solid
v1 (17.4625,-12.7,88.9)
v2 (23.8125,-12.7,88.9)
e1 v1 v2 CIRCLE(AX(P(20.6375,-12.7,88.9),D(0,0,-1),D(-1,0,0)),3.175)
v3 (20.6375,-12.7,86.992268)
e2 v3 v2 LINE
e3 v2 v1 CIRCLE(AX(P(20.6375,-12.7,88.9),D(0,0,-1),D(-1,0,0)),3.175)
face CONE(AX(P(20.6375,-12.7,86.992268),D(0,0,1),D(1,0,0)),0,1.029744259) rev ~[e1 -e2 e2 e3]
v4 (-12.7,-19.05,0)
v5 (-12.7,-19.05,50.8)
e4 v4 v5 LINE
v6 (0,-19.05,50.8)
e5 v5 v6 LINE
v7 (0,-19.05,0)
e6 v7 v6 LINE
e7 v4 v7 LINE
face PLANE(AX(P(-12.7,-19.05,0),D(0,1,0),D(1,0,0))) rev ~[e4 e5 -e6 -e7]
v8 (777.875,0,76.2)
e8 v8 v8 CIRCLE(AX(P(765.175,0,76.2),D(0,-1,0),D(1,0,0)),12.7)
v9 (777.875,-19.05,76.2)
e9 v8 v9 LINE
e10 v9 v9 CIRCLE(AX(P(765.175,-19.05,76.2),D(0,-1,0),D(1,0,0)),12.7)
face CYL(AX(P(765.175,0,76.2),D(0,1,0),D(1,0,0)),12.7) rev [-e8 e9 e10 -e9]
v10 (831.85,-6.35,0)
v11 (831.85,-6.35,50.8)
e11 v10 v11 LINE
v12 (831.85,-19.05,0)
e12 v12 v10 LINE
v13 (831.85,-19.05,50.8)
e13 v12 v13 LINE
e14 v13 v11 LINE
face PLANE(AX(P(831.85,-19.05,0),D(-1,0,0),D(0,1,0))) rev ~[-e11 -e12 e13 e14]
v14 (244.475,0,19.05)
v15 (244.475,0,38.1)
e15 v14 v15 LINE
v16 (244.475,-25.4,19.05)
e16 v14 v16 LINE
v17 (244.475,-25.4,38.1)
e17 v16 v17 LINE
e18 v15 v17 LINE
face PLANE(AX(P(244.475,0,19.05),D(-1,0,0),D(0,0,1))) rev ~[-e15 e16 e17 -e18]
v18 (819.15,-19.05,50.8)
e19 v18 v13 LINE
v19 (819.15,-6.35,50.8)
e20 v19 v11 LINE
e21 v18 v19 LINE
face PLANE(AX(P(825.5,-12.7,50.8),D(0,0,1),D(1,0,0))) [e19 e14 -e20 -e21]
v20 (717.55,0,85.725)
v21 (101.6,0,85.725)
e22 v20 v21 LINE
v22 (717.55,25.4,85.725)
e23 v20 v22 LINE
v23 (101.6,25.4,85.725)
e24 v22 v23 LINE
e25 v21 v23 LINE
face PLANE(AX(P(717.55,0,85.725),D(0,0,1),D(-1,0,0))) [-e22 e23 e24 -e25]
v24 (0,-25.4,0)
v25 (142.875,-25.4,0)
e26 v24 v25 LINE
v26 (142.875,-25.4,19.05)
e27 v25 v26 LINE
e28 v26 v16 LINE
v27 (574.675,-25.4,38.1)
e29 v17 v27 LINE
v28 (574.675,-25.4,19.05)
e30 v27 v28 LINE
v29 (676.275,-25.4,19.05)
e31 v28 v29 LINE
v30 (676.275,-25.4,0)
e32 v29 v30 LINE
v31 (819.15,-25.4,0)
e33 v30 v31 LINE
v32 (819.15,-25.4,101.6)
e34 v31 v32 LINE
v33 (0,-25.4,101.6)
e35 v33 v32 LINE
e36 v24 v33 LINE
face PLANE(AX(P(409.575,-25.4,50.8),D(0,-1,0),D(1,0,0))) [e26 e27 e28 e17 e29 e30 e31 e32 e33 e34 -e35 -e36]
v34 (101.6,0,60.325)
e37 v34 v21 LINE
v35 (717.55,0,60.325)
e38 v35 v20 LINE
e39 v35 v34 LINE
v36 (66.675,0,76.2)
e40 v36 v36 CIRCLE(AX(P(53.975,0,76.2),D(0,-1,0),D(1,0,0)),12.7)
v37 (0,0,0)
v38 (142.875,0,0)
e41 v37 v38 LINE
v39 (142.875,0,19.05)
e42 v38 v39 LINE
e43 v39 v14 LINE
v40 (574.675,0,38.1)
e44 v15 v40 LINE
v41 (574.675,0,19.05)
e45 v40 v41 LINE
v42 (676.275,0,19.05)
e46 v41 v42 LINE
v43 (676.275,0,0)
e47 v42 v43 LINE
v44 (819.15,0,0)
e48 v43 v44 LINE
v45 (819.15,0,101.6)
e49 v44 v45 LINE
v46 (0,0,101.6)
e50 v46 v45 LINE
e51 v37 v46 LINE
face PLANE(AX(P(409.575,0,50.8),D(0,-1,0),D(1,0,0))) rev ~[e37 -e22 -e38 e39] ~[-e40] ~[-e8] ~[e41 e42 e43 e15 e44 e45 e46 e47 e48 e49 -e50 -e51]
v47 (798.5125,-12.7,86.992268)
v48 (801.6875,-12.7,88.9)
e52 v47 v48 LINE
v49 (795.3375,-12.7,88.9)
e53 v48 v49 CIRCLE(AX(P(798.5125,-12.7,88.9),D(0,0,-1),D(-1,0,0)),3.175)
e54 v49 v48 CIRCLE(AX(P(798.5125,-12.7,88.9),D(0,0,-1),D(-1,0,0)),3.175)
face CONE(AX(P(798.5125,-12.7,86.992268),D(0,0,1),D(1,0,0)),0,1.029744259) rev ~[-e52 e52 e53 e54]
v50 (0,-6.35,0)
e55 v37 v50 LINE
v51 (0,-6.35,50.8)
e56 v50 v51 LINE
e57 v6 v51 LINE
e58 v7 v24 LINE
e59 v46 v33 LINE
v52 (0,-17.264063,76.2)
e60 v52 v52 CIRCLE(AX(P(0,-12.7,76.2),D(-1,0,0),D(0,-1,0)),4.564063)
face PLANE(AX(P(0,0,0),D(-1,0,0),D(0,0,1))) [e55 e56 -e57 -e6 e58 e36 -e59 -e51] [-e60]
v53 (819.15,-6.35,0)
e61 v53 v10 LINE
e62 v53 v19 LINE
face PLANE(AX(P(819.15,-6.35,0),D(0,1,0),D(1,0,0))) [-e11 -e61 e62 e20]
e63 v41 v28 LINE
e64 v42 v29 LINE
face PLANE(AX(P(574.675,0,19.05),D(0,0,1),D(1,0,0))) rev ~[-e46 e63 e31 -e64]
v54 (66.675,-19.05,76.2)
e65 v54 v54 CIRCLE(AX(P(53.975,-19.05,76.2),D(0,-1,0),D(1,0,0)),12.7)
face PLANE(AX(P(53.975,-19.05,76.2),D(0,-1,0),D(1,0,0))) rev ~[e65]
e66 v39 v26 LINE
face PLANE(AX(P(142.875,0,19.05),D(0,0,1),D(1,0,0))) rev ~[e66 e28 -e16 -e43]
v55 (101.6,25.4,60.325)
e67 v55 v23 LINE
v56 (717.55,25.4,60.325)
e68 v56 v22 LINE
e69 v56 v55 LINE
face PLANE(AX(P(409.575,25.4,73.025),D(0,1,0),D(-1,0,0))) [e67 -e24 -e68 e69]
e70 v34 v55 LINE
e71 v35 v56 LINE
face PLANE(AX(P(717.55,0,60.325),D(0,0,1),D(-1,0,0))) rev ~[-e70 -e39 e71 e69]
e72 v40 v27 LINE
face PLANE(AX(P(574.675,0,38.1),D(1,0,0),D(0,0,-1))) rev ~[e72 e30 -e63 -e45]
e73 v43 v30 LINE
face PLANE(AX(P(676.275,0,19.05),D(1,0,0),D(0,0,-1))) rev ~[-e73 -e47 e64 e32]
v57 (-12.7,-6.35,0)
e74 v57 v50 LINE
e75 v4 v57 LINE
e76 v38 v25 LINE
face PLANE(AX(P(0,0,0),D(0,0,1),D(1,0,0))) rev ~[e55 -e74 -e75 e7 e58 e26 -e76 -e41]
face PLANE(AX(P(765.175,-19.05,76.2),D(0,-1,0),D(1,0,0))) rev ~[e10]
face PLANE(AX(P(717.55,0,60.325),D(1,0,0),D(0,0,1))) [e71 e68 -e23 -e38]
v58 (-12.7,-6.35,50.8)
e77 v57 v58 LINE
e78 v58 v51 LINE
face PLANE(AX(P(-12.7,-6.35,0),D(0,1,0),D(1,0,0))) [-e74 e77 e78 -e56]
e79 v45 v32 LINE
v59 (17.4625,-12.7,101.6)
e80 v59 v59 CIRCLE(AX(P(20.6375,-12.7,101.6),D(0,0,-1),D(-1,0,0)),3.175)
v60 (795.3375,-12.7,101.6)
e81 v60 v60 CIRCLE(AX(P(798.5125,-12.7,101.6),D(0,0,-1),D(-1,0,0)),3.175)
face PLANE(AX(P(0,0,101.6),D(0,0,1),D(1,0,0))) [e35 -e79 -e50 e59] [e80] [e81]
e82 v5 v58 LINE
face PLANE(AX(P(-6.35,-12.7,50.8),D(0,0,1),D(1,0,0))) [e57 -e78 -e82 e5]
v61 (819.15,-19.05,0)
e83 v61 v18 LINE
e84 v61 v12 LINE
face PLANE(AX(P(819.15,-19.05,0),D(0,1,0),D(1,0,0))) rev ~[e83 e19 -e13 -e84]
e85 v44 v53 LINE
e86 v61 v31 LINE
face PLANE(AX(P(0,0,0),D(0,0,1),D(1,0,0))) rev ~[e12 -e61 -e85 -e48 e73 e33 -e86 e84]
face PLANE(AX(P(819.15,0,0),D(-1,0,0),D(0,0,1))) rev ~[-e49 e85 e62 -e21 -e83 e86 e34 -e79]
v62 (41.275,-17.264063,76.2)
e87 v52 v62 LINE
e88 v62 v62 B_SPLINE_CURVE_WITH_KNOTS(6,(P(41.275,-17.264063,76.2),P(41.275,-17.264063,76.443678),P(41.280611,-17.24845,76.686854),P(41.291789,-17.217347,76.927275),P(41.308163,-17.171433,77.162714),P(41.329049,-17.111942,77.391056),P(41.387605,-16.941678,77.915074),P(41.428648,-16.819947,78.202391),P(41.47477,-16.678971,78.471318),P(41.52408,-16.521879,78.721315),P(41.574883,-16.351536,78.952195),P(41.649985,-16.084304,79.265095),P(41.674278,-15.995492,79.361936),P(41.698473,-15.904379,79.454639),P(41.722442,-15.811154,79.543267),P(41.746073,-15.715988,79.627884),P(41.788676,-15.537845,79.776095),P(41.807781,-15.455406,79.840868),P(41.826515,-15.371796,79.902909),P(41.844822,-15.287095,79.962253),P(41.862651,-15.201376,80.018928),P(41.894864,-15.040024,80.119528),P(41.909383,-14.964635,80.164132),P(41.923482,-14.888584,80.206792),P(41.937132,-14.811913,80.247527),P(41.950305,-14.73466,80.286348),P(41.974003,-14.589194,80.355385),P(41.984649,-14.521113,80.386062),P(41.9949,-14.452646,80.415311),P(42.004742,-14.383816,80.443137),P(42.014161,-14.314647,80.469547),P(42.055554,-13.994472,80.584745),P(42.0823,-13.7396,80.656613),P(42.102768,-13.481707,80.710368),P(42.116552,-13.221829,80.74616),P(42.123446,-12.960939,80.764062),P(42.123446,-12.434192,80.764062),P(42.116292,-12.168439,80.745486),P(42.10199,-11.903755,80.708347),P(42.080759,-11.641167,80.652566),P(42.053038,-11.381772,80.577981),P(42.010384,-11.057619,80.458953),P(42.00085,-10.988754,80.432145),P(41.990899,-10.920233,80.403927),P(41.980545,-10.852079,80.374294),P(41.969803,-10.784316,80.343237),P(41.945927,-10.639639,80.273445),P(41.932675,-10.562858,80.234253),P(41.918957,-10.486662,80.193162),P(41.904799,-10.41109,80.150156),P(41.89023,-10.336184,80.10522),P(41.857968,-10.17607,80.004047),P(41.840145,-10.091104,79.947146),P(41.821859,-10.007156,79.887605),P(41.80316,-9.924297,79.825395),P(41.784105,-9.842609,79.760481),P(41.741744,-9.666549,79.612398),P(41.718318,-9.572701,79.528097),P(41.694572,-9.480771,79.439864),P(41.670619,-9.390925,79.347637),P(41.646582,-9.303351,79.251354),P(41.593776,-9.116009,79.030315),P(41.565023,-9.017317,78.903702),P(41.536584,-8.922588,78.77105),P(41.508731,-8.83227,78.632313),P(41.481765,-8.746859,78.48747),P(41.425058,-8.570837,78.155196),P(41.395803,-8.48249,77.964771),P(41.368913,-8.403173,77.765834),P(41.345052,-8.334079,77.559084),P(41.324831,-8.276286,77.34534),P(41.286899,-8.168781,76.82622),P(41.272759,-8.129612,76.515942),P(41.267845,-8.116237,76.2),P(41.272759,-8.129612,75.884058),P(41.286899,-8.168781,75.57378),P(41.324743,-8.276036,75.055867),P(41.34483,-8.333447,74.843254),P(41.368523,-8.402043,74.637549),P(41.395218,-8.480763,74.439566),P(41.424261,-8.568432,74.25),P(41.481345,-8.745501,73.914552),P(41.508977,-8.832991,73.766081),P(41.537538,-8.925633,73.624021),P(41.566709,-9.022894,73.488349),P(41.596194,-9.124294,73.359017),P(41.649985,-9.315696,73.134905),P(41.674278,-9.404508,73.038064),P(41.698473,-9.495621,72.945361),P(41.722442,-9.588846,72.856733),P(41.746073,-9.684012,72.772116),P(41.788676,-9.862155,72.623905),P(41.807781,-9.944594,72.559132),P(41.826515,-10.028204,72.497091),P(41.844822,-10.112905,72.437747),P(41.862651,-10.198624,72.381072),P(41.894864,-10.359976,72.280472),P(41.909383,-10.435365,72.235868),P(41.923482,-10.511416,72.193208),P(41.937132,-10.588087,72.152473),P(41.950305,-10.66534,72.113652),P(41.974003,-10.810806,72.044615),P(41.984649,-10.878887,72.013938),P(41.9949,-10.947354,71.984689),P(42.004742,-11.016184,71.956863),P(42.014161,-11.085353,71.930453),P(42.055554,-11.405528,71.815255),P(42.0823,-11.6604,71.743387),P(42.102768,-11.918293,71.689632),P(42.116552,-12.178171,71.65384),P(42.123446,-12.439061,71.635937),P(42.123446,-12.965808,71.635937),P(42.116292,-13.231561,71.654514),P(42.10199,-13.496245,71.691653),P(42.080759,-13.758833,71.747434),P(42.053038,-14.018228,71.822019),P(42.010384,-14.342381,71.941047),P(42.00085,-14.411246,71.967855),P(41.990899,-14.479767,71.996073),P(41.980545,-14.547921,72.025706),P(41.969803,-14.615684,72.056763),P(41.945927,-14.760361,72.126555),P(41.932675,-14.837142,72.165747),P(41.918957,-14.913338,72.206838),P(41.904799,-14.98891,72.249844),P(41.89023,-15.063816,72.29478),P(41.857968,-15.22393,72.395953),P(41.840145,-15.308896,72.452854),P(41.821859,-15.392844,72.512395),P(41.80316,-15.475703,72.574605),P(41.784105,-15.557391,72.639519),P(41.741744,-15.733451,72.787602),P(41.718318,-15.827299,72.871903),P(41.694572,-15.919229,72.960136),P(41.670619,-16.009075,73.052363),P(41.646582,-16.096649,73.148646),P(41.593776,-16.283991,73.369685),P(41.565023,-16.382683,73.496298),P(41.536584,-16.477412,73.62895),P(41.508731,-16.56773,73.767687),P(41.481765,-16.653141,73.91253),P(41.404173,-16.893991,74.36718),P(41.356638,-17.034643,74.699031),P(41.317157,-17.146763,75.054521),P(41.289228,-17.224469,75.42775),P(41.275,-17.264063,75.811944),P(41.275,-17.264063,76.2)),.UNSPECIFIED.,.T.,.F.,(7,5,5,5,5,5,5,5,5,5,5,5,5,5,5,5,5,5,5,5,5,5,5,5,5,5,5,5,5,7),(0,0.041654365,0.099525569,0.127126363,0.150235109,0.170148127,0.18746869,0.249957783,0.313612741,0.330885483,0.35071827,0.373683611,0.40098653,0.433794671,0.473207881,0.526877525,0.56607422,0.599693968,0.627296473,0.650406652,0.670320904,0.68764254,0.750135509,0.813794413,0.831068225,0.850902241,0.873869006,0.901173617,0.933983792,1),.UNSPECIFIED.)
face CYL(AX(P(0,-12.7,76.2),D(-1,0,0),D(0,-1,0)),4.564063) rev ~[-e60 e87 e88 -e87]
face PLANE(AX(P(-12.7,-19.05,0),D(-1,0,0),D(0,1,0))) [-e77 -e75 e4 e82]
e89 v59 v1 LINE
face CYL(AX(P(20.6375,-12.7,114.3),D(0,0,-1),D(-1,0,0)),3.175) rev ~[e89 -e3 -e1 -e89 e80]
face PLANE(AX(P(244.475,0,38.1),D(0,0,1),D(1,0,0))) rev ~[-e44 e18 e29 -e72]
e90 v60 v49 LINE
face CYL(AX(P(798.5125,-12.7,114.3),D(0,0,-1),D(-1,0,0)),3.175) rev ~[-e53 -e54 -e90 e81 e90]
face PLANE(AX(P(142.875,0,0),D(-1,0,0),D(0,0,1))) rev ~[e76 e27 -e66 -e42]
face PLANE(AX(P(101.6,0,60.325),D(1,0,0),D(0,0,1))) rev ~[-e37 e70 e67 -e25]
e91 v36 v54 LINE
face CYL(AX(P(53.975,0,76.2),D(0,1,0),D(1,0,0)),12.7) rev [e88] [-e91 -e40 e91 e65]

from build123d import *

# Parameters (mm, degrees)
F0_W      = 819.15
F0_H      = 101.6
F1_DEPTH  = 25.4
F2_R      = 4.5640625
F3_DEPTH  = 50.8
F4_R      = 12.7
F5_DEPTH  = 19.05
F7_DEPTH  = 25.4
F9_D      = 6.35
F9_DEPTH  = 12.7
F9_TIP    = 1.9077324654
F10_W     = 12.7
F10_H     = 12.7
F11_DEPTH = 50.8
F12_W     = 615.95
F12_H     = 25.4
F13_DEPTH = 25.4


# Not quite as in the source:
# - a feature names something its author has since deleted; it is built from what else it names


with BuildPart() as f1:
    # F0 (on Front) → F1 (new body)
    with BuildSketch(Plane.XZ):
        with Locations((409.575, 50.8)):
            Rectangle(F0_W, F0_H)
    extrude(amount=F1_DEPTH)

    # F2 (on face) → F3 (cut)
    with BuildSketch(Plane(origin=(0, 0, 0), x_dir=(0, -1, 0), z_dir=(-1, 0, 0))):
        with Locations((12.7, 76.2)):
            Circle(F2_R)
    extrude(amount=-F3_DEPTH, mode=Mode.SUBTRACT)

    # F4 (on Front) → F5 (cut)
    with BuildSketch(Plane.XZ):
        with Locations((765.175, 76.2)):
            Circle(F4_R)
        with Locations((53.975, 76.2)):
            Circle(F4_R)
    extrude(amount=F5_DEPTH, mode=Mode.SUBTRACT)

    # F6 (on face) → F7 (cut, through all)
    with BuildSketch(Plane(origin=(0, 0, 0), x_dir=(-1, 0, 0), z_dir=(0, 1, 0))):
        Polygon((-676.275, 19.05), (-676.275, 0), (-142.875, 0), (-142.875, 19.05), (-244.475, 19.05), (-244.475, 38.1), (-574.675, 38.1), (-574.675, 19.05), align=None)
    extrude(amount=-F7_DEPTH, mode=Mode.SUBTRACT)

    # F9
    with Locations(Plane.XY.offset(101.6)):
        with Locations((20.6375, -12.7), (798.5125, -12.7)):
            Hole(F9_D / 2, depth=F9_DEPTH)
            with Locations((0, 0, -(F9_DEPTH + F9_TIP / 2))):  # 118° drill point
                Cone(0, F9_D / 2, F9_TIP, mode=Mode.SUBTRACT)

    # F10 (on Top) → F11 (join)
    with BuildSketch(Plane.XY):
        with Locations((-6.35, -12.7)):
            Rectangle(F10_W, F10_H)
        with Locations((825.5, -12.7)):
            Rectangle(F10_W, F10_H)
    extrude(amount=F11_DEPTH)

    # F12 (on face) → F13 (join)
    with BuildSketch(Plane(origin=(0, 0, 0), x_dir=(-1, 0, 0), z_dir=(0, 1, 0))):
        with Locations((-409.575, 73.025)):
            Rectangle(F12_W, F12_H)
    extrude(amount=F13_DEPTH)


solid = f1.part
